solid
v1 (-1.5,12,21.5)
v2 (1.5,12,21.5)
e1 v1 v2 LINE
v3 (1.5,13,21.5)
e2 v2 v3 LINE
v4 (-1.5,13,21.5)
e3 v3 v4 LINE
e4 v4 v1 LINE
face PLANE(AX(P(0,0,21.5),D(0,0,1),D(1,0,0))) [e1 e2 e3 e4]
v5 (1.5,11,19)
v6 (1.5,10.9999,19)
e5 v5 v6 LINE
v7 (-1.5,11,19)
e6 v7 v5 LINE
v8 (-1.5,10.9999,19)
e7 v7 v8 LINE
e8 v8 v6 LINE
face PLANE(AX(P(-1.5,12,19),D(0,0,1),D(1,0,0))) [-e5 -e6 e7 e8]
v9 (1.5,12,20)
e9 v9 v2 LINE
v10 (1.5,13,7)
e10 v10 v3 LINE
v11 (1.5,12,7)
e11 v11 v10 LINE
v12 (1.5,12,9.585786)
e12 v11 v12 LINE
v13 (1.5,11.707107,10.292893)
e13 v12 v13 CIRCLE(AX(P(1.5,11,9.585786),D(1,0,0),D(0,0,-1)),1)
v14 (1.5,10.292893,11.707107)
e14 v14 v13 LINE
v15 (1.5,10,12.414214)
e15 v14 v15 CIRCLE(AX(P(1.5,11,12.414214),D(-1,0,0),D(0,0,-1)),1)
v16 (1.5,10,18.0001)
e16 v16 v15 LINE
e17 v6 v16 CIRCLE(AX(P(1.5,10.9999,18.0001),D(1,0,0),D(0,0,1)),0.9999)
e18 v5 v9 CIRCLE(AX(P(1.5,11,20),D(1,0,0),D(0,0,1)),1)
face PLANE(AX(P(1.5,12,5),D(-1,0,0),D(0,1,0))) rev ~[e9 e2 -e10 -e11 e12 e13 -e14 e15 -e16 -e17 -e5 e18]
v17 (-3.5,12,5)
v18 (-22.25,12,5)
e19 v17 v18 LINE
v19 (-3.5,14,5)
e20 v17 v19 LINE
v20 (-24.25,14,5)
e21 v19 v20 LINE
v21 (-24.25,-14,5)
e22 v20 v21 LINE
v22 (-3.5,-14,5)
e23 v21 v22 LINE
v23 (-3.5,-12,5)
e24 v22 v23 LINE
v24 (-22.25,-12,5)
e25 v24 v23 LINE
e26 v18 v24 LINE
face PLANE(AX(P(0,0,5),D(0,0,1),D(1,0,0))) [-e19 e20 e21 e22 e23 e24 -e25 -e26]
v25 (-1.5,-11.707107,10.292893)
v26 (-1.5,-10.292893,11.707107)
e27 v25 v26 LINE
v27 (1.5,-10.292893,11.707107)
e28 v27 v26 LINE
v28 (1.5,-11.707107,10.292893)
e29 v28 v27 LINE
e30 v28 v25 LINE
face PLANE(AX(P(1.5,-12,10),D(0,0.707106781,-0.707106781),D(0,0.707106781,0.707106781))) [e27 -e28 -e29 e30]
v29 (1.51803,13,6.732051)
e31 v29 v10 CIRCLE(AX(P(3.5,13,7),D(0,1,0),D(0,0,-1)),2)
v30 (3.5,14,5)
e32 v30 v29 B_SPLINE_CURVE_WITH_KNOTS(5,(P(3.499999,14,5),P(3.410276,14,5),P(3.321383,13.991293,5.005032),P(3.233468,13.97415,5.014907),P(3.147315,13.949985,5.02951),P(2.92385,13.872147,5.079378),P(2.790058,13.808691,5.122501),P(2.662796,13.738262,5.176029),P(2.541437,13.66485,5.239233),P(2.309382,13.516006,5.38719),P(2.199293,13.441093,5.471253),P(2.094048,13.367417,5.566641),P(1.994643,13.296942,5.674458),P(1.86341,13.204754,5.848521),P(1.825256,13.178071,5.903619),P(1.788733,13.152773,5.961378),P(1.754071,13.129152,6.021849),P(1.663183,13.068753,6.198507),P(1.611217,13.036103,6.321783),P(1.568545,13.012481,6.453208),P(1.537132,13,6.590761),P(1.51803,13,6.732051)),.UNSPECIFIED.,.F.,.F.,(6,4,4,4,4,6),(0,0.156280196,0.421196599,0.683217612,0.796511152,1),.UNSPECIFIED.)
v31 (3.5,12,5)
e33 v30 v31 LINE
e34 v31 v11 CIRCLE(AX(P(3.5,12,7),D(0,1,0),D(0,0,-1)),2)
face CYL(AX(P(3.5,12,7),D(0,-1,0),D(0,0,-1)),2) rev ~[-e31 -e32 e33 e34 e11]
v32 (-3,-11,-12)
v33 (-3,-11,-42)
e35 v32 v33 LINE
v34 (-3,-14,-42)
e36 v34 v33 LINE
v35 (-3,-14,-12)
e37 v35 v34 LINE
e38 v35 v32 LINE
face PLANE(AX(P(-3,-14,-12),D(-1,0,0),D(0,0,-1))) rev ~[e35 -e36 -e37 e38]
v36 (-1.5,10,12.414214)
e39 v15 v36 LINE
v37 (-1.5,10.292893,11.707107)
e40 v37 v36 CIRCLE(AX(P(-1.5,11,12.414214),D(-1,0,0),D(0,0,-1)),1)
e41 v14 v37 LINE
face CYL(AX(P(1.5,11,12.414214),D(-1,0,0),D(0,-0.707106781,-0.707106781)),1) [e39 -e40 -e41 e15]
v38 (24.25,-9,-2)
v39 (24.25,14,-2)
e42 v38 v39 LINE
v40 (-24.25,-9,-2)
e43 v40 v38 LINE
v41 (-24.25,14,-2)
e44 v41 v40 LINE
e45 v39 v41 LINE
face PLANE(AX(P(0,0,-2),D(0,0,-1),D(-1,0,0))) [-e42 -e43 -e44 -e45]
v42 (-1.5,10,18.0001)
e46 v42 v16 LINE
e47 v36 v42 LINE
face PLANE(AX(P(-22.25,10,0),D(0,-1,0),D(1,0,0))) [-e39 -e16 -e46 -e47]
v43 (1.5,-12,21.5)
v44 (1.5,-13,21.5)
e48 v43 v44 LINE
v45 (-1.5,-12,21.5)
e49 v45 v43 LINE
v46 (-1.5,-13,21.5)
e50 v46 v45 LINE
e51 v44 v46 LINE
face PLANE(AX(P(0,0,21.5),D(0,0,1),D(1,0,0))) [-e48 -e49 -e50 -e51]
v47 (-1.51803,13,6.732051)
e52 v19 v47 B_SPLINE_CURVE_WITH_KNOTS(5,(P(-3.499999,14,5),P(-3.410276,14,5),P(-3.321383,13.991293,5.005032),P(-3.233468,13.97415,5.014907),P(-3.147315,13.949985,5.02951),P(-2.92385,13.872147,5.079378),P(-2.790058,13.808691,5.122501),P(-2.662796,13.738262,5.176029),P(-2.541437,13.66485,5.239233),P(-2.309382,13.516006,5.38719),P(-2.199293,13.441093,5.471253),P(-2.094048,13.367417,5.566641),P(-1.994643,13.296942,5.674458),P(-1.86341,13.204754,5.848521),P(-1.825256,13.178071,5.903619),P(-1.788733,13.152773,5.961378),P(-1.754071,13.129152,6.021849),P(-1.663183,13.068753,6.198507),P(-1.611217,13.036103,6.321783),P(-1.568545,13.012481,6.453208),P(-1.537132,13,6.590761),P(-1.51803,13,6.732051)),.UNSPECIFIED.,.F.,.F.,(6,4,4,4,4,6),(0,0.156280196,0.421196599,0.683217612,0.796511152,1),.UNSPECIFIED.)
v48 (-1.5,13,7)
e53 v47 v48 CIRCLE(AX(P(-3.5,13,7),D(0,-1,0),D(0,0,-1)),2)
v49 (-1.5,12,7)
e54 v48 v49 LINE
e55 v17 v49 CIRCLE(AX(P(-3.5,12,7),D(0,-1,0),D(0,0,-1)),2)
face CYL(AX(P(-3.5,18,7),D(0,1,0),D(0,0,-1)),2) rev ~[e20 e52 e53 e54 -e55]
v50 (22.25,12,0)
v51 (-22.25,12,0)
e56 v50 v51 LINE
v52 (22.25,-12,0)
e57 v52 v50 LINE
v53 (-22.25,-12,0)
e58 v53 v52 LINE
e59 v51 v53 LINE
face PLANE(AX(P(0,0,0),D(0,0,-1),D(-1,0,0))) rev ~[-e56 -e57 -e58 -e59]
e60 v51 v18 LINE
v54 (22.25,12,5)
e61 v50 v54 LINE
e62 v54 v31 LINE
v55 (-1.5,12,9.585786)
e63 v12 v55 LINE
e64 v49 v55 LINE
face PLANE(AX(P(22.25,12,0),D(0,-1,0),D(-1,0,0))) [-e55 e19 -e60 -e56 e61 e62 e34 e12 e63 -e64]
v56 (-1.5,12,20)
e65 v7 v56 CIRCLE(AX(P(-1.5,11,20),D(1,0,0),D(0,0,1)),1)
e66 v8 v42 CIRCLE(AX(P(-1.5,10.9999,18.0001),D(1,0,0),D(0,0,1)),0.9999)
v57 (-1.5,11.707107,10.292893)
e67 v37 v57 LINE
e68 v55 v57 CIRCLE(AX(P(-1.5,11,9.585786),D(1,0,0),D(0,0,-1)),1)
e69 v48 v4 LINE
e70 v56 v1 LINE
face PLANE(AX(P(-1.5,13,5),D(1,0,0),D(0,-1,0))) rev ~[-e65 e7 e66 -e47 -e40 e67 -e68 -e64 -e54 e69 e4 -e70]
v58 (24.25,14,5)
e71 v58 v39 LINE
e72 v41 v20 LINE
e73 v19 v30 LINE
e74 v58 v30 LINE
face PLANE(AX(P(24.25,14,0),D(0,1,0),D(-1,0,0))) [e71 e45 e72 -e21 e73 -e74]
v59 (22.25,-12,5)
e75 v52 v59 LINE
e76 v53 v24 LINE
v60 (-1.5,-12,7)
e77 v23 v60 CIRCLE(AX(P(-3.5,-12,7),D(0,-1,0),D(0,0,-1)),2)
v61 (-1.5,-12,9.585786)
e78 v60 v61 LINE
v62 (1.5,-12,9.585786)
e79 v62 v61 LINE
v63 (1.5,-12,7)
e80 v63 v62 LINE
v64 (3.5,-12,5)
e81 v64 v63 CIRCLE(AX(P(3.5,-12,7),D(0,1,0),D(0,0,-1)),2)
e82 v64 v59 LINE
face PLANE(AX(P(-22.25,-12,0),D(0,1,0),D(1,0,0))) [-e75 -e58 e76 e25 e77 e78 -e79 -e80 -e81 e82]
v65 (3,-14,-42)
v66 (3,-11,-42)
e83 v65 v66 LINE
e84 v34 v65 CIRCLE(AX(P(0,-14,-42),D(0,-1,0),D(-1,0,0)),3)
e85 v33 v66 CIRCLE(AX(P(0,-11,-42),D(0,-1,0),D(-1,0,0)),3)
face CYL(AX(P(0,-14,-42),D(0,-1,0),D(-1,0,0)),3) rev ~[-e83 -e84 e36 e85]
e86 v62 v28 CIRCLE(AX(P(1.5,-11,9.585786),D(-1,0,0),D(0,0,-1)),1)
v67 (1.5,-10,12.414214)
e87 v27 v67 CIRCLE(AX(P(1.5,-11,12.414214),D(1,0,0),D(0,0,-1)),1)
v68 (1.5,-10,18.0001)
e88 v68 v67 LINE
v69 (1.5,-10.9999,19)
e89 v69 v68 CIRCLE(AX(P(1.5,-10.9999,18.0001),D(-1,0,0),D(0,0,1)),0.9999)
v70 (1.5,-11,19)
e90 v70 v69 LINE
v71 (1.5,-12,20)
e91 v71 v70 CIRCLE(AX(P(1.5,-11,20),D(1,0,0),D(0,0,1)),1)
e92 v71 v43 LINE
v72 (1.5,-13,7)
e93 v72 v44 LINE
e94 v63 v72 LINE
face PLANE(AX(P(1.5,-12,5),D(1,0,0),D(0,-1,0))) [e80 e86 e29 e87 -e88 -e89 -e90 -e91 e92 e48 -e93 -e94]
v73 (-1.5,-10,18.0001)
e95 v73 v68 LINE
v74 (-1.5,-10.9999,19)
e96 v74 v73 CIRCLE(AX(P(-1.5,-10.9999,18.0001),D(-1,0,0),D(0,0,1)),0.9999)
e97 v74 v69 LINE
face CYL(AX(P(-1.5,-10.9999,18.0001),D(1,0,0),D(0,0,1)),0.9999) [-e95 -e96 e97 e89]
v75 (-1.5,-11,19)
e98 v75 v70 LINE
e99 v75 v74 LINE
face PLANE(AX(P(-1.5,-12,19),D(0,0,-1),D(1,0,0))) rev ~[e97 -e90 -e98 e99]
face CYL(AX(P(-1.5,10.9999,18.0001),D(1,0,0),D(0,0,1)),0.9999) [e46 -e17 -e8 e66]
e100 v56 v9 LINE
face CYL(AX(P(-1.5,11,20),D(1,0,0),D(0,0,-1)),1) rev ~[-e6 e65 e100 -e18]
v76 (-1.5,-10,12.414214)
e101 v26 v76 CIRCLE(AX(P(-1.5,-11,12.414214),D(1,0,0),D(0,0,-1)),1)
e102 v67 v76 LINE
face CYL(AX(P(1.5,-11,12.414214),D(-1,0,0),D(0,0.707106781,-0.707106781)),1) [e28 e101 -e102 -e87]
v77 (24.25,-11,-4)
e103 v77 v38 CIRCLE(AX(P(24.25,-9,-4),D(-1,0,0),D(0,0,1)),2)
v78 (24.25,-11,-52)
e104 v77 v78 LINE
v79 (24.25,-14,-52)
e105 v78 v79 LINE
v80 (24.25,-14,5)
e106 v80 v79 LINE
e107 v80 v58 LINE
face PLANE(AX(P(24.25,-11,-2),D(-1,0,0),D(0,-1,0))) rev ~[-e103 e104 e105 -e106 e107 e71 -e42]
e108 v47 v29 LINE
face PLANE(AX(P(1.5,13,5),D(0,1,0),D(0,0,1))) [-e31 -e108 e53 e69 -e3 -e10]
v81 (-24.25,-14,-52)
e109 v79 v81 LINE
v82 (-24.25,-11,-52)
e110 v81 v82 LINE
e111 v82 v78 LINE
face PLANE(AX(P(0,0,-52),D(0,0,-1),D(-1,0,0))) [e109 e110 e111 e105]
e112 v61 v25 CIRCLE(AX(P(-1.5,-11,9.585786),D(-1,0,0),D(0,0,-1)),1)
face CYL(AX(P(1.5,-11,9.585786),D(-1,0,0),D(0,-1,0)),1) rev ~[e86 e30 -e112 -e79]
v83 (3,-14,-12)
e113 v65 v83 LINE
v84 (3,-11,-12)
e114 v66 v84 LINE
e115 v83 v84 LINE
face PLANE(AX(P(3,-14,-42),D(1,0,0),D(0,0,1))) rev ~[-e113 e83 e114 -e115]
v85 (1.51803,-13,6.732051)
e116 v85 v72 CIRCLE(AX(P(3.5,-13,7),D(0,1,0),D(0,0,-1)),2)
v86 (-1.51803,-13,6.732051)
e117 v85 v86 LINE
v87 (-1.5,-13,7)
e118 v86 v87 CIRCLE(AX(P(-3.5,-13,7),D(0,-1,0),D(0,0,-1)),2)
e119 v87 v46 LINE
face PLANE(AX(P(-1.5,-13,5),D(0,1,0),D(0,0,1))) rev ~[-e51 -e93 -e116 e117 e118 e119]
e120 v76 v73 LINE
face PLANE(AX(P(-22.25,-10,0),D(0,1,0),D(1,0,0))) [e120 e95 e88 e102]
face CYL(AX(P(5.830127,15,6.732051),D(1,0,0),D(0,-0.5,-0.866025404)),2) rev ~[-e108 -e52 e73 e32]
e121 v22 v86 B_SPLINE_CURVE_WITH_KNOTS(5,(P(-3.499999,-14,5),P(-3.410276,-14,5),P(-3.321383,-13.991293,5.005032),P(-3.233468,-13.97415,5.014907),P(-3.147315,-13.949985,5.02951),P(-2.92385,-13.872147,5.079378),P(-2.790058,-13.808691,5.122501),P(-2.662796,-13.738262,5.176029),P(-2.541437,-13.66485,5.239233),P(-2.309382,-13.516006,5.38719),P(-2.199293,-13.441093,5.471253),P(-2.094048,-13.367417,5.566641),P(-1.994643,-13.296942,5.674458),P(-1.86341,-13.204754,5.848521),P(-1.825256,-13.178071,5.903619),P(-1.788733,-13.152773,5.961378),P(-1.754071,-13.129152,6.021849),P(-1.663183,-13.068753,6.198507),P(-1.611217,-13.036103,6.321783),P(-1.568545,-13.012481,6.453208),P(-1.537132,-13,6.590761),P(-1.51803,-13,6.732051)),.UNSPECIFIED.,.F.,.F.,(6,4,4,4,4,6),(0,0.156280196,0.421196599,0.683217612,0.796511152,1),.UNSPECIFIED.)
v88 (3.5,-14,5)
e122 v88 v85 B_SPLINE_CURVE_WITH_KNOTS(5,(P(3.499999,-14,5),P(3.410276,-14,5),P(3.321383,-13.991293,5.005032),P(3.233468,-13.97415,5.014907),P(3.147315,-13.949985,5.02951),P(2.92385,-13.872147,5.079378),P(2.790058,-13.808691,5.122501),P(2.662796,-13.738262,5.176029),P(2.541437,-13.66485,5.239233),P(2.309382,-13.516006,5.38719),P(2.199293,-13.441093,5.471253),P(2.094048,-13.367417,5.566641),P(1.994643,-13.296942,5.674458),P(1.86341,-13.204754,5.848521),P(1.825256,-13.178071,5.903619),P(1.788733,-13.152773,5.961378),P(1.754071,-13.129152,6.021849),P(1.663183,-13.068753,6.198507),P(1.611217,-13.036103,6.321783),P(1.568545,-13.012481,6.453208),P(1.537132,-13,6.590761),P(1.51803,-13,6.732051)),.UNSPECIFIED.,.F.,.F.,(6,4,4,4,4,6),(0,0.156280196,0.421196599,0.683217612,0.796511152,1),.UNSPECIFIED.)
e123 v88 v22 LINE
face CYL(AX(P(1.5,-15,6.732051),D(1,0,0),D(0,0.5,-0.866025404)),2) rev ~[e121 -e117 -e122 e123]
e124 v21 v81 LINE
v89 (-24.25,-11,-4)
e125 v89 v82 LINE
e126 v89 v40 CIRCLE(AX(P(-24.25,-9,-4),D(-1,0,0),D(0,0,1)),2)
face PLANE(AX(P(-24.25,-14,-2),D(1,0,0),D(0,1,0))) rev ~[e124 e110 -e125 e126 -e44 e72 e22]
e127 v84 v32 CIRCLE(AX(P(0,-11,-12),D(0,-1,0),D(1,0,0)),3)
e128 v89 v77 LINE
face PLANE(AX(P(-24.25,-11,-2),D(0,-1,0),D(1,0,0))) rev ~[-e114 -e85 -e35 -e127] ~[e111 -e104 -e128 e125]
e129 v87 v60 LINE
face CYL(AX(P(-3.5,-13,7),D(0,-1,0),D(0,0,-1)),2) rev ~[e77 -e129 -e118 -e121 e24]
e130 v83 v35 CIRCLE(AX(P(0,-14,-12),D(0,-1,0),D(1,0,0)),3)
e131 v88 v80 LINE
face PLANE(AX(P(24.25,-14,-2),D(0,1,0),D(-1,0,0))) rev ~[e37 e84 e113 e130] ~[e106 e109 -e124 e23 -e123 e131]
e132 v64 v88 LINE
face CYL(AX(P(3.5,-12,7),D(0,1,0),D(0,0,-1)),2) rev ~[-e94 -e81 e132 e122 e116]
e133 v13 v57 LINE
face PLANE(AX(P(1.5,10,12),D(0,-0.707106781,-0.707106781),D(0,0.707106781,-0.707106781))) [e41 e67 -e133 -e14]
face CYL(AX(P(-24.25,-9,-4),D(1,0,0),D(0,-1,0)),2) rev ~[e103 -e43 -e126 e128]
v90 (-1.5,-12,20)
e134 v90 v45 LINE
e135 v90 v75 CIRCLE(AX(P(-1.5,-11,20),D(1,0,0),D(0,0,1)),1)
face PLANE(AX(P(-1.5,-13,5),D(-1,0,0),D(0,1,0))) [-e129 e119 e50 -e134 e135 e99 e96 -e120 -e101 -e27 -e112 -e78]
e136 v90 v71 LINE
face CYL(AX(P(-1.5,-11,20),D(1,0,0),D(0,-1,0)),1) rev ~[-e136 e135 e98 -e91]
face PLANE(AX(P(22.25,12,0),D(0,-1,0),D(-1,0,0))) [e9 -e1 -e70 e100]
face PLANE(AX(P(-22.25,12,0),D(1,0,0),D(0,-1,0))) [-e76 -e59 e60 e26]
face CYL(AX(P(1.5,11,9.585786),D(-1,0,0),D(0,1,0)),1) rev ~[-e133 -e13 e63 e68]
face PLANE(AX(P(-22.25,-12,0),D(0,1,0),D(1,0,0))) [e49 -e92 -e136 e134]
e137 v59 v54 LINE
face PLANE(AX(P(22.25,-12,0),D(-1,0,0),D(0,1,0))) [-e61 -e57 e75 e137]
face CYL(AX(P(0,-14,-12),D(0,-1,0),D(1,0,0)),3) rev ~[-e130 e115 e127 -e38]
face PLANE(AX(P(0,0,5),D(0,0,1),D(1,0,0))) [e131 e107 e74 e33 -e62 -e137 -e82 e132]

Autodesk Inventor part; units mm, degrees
ref_plane "YZ Plane" through (0, 0, 0) normal (1, 0, 0) x (0, 1, 0)
ref_plane "XZ Plane" through (0, 0, 0) normal (0, 1, 0) x (-1, 0, 0)
ref_plane "XY Plane" through (0, 0, 0) normal (0, 0, 1) x (1, 0, 0)
sketch "Sketch2" plane through (0, 0, 0) normal (0, 0, 1) x (1, 0, 0)
  line L0 (22.25, 12) -> (-22.25, 12)
  line L1 (-22.25, 12) -> (-22.25, -12)
  line L2 (-22.25, -12) -> (22.25, -12)
  line L3 (22.25, -12) -> (22.25, 12)
  line L4 (22.25, 12) -> (-22.25, -12) construction
  line L5 (-22.25, 12) -> (22.25, -12) construction
  line L6 (24.25, 14) -> (-24.25, 14)
  line L7 (-24.25, 14) -> (-24.25, -14)
  line L8 (-24.25, -14) -> (24.25, -14)
  line L9 (24.25, -14) -> (24.25, 14)
  line L10 (24.25, 14) -> (-24.25, -14) construction
  line L11 (-24.25, 14) -> (24.25, -14) construction
  point P0 (0, 0)
  dimension "d0" = 44.5
  dimension "d1" = 24
  dimension "d2" = 48.5
  dimension "d3" = 28
extrude "Extrusion1" add sketch "Sketch2" along normal blind 5
sketch "Sketch3" plane through (0, 0, 5) normal (0, 0, 1) x (1, 0, 0)
  line L0 (-24.25, 14) -> (-24.25, -14) construction
  line L1 (-24.25, -14) -> (24.25, -14) construction
  line L2 (24.25, -14) -> (24.25, 14) construction
  line L3 (24.25, 14) -> (-24.25, 14) construction
  line L4 (22.25, 12) -> (22.25, -12) construction
  line L5 (22.25, -12) -> (-22.25, -12) construction
  line L6 (-22.25, -12) -> (-22.25, 12) construction
  line L7 (-22.25, 12) -> (22.25, 12) construction
  line L8 (1.5, -13) -> (-1.5, -13)
  line L9 (-1.5, -13) -> (-1.5, -12)
  line L10 (-1.5, -12) -> (1.5, -12)
  line L11 (1.5, -12) -> (1.5, -13)
  line L12 (1.5, -13) -> (-1.5, -12) construction
  line L13 (-1.5, -13) -> (1.5, -12) construction
  line L14 (1.5, 13) -> (-1.5, 13)
  line L15 (-1.5, 13) -> (-1.5, 12)
  line L16 (-1.5, 12) -> (1.5, 12)
  line L17 (1.5, 12) -> (1.5, 13)
  line L18 (1.5, 13) -> (-1.5, 12) construction
  line L19 (-1.5, 13) -> (1.5, 12) construction
  line L20 (0, 19.6) -> (0, -19.6) construction
  point P0 (0, 0)
  point P1 (0, -12.5)
  point P2 (0, -12.5)
  point P3 (0, 12.5)
  point P4 (0, 12.5)
  dimension "d8" = 3
  dimension "d19" = 1
  dimension "d22" = 3
  dimension "d23" = 1
extrude "Extrusion2" add sketch "Sketch3" along normal blind 16.5
sketch "Sketch4" plane through (-22.25, -12, 0) normal (0, 1, 0) x (1, 0, 0)
  line L0 (44.5, 0) -> (0, 0) construction
  line L1 (0, 0) -> (0, -5) construction
  line L2 (20.75, -5) -> (0, -5) construction
  line L3 (20.75, -5) -> (20.75, -21.5) construction
  line L4 (23.75, -21.5) -> (20.75, -21.5) construction
  line L5 (23.75, -5) -> (23.75, -21.5) construction
  line L6 (44.5, -5) -> (23.75, -5) construction
  line L7 (44.5, 0) -> (44.5, -5) construction
  line L8 (20.75, -19) -> (23.75, -19)
  line L9 (23.75, -19) -> (23.75, -10)
  line L10 (23.75, -10) -> (20.75, -10)
  line L11 (20.75, -10) -> (20.75, -19)
  line L12 (20.75, -19) -> (23.75, -10) construction
  line L13 (23.75, -19) -> (20.75, -10) construction
  line L14 (22.25, 4.3) -> (22.25, -25.8) construction
  point P0 (22.25, 0)
  point P1 (22.25, -14.5)
  point P2 (22.25, -14.5)
  dimension "d12" = 10
  dimension "d13" = 9
extrude "Extrusion3" add sketch "Sketch4" along normal blind 2
sketch "Sketch5" plane through (1.5, -14, 5) normal (1, 0, 0) x (0, 0, -1)
  line L0 (0, 2) -> (0, 1) construction
  line L1 (0, 2) -> (-5, 2) construction
  line L2 (-5, 2) -> (-5, 4) construction
  line L3 (-14, 4) -> (-5, 4) construction
  line L4 (-14, 2) -> (-14, 4) construction
  line L5 (-14, 2) -> (-16.5, 2) construction
  line L6 (-16.5, 1) -> (-16.5, 2) construction
  line L7 (0, 1) -> (-16.5, 1) construction
  line L8 (-5, 2) -> (-7, 4)
  line L9 (-5, 2) -> (-5, 4)
  line L10 (-7, 4) -> (-5, 4)
  point P0 (5, 14)
  dimension "d16" = 2
extrude "Extrusion4" cut sketch "Sketch5" against normal up to surface (3 mm away)
sketch "Sketch6" plane through (-22.25, 12, 0) normal (0, -1, 0) x (1, 0, 0)
  line L0 (23.75, 12) -> (20.75, 12) construction
  line L1 (20.75, 10) -> (23.75, 10) construction
  line L2 (23.75, 19) -> (20.75, 19) construction
  line L3 (20.75, 19) -> (23.75, 19)
  line L4 (23.75, 19) -> (23.75, 10)
  line L5 (23.75, 10) -> (20.75, 10)
  line L6 (20.75, 10) -> (20.75, 19)
  point P0 (22.25, 0)
extrude "Extrusion5" add sketch "Sketch6" along normal blind 2
sketch "Sketch8" plane through (1.5, 12, 5) normal (1, 0, 0) x (0, 0, -1)
  line L0 (0, 1) -> (0, 0) construction
  line L1 (0, 1) -> (-16.5, 1) construction
  line L2 (-16.5, 0) -> (-16.5, 1) construction
  line L3 (-14, 0) -> (-16.5, 0) construction
  line L4 (-14, 0) -> (-14, -2) construction
  line L5 (-5, -2) -> (-14, -2) construction
  line L6 (-5, 0) -> (-5, -2) construction
  line L7 (0, 0) -> (-5, 0) construction
  line L8 (-7, -2) -> (-5, 0)
  line L9 (-7, -2) -> (-5, -2)
  line L10 (-5, -2) -> (-5, 0)
  point P0 (5, -12)
  dimension "d26" = 2
extrude "Extrusion6" cut sketch "Sketch8" against normal up to surface (3 mm away)
fillet "Fillet1" radius 2 6 edges at (1.5, -12.5, 5) (0, -13, 5) (-1.5, -12.5, 5) (1.5, 12.5, 5) (0, 13, 5) (-1.5, 12.5, 5)
fillet "Fillet2" radius 1 4 edges at (0, -12, 10) (0, -10, 12) (0, 12, 10) (0, 10, 12)
sketch "Sketch9" plane through (0, 0, 0) normal (0, 0, -1) x (-1, 0, 0)
  line L0 (24.25, 14) -> (24.25, -14) construction
  line L1 (-24.25, 14) -> (24.25, 14) construction
  line L2 (-24.25, -14) -> (-24.25, 14) construction
  line L3 (24.25, -14) -> (-24.25, -14) construction
  line L4 (-22.25, 12) -> (-22.25, -12) construction
  line L5 (22.25, 12) -> (-22.25, 12) construction
  line L6 (22.25, -12) -> (22.25, 12) construction
  line L7 (-22.25, -12) -> (22.25, -12) construction
  line L8 (-24.25, 14) -> (24.25, 14)
  line L9 (24.25, 14) -> (24.25, -14)
  line L10 (24.25, -14) -> (-24.25, -14)
  line L11 (-24.25, -14) -> (-24.25, 14)
  point P0 (0, 0)
extrude "Extrusion7" add sketch "Sketch9" along normal blind 2
fillet "Fillet3" radius 1 2 edges at (0, -12, 19) (0, 12, 19)
fillet "Fillet4" radius 1 2 edges at (0, -10, 19) (0, 10, 19)
sketch "Sketch10" plane through (0, 0, -2) normal (0, 0, -1) x (-1, 0, 0)
  line L0 (-22.25, -12) -> (22.25, -12) construction
  line L1 (-24.25, -14) -> (24.25, -14) construction
  line L2 (24.25, -14) -> (24.25, 14) construction
  line L3 (24.25, 14) -> (-24.25, 14) construction
  line L4 (-24.25, 14) -> (-24.25, -14) construction
  line L5 (-24.25, -14) -> (24.25, -14)
  line L6 (24.25, -14) -> (24.25, -11)
  line L7 (24.25, -11) -> (-24.25, -11)
  line L8 (-24.25, -11) -> (-24.25, -14)
  point P0 (0, 0)
  dimension "d35" = 3
extrude "Extrusion8" add sketch "Sketch10" along normal blind 50
sketch "Sketch11" plane through (3.5, -14, 5) normal (0, -1, 0) x (1, 0, 0)
  line L0 (20.75, -7) -> (-27.75, -7) construction
  line L1 (-3.5, -47) -> (-3.5, -17) construction
  line L2 (-0.5, -47) -> (-0.5, -17)
  line L3 (-6.5, -17) -> (-6.5, -47)
  arc A0 (-6.5, -47) -> (-0.5, -47) centre (-3.5, -47) ccw
  arc A1 (-0.5, -17) -> (-6.5, -17) centre (-3.5, -17) ccw
  line L4 (20.75, -57) -> (-27.75, -57) construction
  line L5 (-3.5, 31.2) -> (-3.5, -71.7) construction
  point P0 (-3.5, -5)
  point P1 (-3.5, -32)
  dimension "d38" = 6
  dimension "d39" = 25
  dimension "d40" = 25
  dimension "d41" = 30
  dimension "d42" = 3
extrude "Extrusion9" cut sketch "Sketch11" against normal blind 10
fillet "Fillet5" radius 2 1 edges at (0, -11, -2)
properties part number "P036_SupportLidar"
